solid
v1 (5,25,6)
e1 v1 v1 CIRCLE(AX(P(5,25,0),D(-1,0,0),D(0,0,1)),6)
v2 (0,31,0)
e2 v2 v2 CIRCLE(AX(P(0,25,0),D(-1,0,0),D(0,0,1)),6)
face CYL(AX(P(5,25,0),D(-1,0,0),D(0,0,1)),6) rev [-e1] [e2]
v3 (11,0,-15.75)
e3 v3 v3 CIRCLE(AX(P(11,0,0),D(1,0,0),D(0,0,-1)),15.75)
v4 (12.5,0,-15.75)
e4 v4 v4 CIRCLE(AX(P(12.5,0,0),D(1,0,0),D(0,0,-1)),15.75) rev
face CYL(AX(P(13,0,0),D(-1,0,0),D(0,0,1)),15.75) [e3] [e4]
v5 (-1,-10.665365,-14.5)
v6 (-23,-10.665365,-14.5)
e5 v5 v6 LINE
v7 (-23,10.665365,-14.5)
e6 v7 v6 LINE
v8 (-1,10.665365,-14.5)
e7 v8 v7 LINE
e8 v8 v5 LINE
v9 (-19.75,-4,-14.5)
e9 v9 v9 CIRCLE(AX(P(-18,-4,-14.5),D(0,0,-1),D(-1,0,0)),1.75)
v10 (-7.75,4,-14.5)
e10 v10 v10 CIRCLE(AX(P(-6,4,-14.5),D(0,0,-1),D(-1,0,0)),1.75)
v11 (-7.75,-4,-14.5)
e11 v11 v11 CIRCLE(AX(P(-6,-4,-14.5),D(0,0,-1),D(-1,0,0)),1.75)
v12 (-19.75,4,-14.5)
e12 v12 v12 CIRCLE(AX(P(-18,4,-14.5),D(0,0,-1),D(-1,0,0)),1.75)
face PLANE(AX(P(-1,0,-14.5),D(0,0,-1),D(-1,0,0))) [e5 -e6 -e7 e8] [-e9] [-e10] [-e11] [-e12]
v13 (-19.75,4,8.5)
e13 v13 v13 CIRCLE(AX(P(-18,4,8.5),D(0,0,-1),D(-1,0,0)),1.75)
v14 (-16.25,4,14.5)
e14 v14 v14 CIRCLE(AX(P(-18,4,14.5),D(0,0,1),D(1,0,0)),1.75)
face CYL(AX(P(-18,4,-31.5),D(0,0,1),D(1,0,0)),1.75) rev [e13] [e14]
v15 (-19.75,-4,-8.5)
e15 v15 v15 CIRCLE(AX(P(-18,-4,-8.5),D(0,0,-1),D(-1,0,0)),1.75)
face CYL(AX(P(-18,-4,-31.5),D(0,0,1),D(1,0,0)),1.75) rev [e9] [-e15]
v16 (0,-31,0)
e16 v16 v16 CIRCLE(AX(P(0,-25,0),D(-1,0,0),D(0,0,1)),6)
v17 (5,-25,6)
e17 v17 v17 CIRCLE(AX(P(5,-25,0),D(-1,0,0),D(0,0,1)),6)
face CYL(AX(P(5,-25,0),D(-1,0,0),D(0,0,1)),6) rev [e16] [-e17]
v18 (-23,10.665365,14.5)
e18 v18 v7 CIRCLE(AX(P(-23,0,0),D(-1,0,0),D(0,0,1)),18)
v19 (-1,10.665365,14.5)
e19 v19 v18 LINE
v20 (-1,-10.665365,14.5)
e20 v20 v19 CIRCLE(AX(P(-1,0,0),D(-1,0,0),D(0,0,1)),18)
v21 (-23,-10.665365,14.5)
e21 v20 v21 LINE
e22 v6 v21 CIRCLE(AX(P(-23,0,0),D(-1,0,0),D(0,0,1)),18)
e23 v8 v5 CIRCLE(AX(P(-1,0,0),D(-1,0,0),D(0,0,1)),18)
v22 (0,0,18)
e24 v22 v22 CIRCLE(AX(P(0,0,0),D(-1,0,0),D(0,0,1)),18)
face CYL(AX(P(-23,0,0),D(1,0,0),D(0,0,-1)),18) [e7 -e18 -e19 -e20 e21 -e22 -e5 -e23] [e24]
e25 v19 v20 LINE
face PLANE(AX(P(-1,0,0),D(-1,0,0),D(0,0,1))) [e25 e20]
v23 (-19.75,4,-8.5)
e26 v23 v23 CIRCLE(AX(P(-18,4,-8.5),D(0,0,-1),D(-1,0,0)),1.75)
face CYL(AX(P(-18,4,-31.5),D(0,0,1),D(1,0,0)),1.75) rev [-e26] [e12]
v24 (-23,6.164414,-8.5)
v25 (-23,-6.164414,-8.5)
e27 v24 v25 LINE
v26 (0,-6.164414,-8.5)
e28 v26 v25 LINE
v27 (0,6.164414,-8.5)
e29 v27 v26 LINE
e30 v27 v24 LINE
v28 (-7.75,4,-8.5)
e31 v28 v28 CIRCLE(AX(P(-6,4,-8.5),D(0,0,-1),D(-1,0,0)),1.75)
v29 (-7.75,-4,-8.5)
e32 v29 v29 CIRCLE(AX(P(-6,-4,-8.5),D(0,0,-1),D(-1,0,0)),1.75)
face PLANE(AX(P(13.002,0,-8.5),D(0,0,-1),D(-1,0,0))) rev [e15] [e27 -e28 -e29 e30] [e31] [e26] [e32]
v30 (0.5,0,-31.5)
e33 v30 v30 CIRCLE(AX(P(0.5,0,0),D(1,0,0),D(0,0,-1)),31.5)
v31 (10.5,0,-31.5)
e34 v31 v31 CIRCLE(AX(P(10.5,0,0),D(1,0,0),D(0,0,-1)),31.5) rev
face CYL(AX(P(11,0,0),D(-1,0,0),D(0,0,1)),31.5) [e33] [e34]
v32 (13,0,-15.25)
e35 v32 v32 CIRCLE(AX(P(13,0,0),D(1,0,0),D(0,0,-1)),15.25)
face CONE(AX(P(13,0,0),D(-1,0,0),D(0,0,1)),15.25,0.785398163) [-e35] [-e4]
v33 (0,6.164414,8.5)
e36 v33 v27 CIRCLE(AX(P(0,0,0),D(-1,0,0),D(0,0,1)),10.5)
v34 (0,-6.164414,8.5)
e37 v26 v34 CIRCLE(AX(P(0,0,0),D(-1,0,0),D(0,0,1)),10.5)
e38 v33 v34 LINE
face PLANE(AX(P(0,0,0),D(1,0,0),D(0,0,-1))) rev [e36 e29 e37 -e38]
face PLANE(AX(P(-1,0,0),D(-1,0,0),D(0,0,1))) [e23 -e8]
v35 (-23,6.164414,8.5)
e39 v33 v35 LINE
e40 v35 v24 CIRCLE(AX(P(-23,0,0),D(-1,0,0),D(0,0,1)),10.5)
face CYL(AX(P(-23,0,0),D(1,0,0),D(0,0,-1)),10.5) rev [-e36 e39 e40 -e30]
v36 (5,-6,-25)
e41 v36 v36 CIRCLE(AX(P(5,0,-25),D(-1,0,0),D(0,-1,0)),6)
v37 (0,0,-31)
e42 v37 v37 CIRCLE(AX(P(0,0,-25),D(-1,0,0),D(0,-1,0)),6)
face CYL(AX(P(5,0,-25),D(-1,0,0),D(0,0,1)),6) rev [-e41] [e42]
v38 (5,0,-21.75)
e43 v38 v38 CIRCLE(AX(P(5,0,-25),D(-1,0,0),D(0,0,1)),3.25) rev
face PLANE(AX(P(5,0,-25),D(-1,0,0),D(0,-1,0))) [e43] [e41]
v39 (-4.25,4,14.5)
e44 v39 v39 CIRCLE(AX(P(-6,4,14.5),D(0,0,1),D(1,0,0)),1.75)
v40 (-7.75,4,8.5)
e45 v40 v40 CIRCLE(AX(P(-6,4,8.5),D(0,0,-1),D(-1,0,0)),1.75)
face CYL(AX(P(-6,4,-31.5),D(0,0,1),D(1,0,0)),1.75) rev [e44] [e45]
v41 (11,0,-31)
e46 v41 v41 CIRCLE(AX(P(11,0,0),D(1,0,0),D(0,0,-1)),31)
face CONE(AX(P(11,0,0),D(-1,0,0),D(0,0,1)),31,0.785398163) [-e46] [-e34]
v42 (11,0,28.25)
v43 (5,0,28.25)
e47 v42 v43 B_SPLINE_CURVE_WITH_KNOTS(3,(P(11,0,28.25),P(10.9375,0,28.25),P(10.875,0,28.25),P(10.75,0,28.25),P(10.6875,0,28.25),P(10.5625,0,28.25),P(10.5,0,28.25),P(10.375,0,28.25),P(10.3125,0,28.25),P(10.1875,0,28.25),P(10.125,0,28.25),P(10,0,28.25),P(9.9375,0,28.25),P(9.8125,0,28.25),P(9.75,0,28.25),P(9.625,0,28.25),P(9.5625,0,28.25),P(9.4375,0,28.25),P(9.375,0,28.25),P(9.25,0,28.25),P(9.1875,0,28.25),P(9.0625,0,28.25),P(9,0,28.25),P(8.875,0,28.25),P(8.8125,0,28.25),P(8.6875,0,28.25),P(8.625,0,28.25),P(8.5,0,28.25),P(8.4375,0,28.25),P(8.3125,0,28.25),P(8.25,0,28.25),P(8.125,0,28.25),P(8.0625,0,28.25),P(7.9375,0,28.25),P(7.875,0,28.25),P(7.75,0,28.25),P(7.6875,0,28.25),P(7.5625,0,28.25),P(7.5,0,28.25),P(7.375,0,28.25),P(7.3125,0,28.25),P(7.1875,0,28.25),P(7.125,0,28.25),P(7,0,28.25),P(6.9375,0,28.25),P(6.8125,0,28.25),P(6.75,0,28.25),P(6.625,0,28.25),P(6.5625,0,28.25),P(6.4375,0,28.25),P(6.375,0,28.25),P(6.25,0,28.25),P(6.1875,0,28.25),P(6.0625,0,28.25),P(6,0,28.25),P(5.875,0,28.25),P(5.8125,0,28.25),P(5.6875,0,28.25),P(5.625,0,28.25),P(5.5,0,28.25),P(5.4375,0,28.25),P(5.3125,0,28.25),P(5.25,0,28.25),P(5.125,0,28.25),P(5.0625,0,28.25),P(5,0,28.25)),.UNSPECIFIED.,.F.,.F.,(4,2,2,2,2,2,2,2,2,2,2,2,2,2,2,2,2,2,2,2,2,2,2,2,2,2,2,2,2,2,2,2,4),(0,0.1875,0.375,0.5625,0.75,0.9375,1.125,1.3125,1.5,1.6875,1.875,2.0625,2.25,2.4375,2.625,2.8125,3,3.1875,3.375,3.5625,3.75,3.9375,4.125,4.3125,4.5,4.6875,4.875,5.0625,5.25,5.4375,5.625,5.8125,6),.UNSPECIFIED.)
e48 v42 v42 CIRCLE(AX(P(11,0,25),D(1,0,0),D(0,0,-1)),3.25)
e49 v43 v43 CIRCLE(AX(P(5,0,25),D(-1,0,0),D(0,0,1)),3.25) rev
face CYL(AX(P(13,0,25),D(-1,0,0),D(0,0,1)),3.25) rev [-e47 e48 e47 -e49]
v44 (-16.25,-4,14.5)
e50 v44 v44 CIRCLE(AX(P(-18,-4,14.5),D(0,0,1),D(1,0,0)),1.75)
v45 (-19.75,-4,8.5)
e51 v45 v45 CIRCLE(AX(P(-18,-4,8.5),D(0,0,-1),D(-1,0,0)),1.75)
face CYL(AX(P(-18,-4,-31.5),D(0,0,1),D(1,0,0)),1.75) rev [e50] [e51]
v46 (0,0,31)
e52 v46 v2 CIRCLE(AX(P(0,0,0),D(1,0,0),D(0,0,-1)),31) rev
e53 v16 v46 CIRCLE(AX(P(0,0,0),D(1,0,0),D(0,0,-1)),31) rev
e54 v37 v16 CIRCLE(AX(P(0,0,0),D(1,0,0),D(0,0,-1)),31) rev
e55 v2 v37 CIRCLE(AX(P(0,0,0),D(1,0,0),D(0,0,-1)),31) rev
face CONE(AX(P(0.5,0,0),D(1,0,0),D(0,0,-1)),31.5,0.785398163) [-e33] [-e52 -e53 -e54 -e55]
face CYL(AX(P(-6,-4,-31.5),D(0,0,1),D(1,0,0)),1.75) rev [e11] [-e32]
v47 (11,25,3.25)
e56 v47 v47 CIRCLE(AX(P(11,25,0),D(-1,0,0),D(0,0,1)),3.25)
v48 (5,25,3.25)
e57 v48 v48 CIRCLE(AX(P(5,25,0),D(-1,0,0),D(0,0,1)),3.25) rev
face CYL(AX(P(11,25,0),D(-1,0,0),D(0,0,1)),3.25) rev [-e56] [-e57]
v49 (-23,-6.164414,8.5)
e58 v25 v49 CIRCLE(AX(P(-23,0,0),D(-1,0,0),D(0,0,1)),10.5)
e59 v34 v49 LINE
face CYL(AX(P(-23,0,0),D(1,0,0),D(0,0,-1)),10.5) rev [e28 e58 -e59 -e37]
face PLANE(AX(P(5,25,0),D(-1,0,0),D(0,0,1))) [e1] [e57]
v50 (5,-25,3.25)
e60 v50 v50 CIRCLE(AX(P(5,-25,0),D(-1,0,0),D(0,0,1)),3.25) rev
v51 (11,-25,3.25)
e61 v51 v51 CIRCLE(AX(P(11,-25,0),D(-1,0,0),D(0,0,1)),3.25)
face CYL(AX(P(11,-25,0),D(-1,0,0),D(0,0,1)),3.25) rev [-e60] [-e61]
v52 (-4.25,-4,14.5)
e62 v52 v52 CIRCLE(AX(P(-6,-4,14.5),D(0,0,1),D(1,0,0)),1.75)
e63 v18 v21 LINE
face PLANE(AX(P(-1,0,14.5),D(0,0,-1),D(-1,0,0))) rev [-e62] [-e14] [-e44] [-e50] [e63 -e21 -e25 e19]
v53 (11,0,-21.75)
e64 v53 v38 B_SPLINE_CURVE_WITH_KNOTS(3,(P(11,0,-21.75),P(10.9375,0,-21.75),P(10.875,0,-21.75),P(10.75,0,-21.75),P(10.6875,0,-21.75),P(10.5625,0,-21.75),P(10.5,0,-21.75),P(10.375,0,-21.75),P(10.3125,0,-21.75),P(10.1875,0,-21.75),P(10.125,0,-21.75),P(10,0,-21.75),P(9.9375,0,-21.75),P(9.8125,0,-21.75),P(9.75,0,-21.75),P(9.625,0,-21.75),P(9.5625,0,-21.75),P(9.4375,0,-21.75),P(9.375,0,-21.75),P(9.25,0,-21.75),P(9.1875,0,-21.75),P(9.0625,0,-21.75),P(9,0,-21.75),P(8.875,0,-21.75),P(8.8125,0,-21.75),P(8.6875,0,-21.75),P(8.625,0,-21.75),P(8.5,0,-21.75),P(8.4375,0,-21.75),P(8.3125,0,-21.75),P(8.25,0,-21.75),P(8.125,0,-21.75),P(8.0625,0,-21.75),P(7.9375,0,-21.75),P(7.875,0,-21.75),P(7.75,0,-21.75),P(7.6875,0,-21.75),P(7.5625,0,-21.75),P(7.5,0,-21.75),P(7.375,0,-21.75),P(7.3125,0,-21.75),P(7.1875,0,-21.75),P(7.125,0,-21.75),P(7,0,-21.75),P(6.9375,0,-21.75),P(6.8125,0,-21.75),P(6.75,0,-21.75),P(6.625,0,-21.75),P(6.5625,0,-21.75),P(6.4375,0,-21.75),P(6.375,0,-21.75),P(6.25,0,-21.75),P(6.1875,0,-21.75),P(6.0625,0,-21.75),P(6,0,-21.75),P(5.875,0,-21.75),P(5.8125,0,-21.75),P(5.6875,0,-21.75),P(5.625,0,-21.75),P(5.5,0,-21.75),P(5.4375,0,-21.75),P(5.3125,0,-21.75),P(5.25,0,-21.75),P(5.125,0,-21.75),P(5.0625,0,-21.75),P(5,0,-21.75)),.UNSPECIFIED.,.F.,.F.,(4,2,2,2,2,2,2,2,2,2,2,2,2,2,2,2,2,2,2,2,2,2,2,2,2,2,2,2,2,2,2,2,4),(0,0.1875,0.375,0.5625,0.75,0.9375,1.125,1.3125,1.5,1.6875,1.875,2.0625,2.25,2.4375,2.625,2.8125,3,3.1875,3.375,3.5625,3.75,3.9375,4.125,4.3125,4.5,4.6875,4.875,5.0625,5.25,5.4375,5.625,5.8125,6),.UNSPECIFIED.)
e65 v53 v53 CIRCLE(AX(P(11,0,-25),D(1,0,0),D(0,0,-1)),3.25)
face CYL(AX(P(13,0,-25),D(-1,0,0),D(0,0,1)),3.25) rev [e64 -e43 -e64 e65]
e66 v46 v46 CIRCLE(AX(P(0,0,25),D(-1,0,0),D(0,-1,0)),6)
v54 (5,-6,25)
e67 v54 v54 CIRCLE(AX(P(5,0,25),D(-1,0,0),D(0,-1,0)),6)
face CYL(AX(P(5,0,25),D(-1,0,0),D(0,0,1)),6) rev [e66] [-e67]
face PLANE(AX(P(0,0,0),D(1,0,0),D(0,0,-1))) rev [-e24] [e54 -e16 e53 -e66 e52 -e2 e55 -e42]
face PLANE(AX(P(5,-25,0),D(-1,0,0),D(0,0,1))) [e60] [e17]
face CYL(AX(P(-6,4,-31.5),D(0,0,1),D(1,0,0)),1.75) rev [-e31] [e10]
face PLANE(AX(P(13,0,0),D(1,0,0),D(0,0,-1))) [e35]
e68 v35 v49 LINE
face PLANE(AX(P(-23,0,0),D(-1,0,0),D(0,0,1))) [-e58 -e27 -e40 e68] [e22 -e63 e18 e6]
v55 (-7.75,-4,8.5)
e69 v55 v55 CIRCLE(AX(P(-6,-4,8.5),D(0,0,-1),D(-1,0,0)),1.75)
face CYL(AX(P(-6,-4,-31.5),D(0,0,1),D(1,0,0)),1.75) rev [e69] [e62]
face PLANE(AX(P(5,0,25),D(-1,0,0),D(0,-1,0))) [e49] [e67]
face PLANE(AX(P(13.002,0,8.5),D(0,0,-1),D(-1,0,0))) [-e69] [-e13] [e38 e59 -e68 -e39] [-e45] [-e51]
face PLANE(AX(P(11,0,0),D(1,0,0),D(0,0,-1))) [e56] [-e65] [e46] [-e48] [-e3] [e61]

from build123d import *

# Parameters (mm, degrees)
SKETCH1_R           = 31.5
BOSS_EXTRUDE1_DEPTH = 11
SKETCH2_R           = 3.25
CUT_EXTRUDE1_DEPTH  = 46.885727629
SKETCH3_R           = 6
CUT_EXTRUDE2_DEPTH  = 5
CHAMFER1_SIZE       = 0.5
SKETCH4_R           = 15.75
BOSS_EXTRUDE2_DEPTH = 2
CHAMFER2_SIZE       = 0.5
SKETCH5_R           = 18
SKETCH5_R_2         = 10.5
BOSS_EXTRUDE3_DEPTH = 23
BOSS_EXTRUDE4_REACH = 59.276
CUT_EXTRUDE3_START  = -22
CUT_EXTRUDE3_DEPTH  = 22
SKETCH8_R           = 1.75
CUT_EXTRUDE4_DEPTH  = 61.309617807
CIRPATTERN1_COUNT   = 4


with BuildPart() as part:
    # Sketch1 → Boss-Extrude1 (new body)
    with BuildSketch(Plane(origin=(0, 0, 0), x_dir=(0, 0, -1), z_dir=(1, 0, 0))):
        Circle(SKETCH1_R)
    extrude(amount=BOSS_EXTRUDE1_DEPTH)

    # Sketch2 → Cut-Extrude1 (cut, through all)
    with BuildSketch(Plane.ZY):
        with Locations((0, 25)):
            Circle(SKETCH2_R)
        with Locations((0, -25)):
            Circle(SKETCH2_R)
    cut_extrude1 = extrude(amount=-CUT_EXTRUDE1_DEPTH, mode=Mode.SUBTRACT)

    # Sketch3 → Cut-Extrude2 (cut)
    with BuildSketch(Plane.ZY):
        with Locations((0, 25)):
            Circle(SKETCH3_R)
        with Locations((0, -25)):
            Circle(SKETCH3_R)
    cut_extrude2 = extrude(amount=-CUT_EXTRUDE2_DEPTH, mode=Mode.SUBTRACT)

    # Chamfer1
    chamfer1_edges = [part.edges().sort_by_distance(p)[0] for p in [
        (0, 0, 31.5),
        (11, 0, 31.5),
    ]]
    chamfer(chamfer1_edges, length=CHAMFER1_SIZE - 0.0001)  # a hair under: the kernel refuses the full size

    # Sketch4 → Boss-Extrude2 (add)
    with BuildSketch(Plane(origin=(11, 0, 0), x_dir=(0, 0, -1), z_dir=(1, 0, 0))):
        Circle(SKETCH4_R)
    extrude(amount=BOSS_EXTRUDE2_DEPTH)

    # Chamfer2
    chamfer2_edges = [part.edges().sort_by_distance(p)[0] for p in [
        (13, 0, 15.75),
    ]]
    chamfer(chamfer2_edges, length=CHAMFER2_SIZE)

    # Sketch5 → Boss-Extrude3 (add)
    with BuildSketch(Plane.ZY):
        Circle(SKETCH5_R)
        Circle(SKETCH5_R_2, mode=Mode.SUBTRACT)
    extrude(amount=BOSS_EXTRUDE3_DEPTH)

    # Sketch6 → Boss-Extrude4 (add, up to next)
    with BuildSketch(Plane.ZY.offset(23), mode=Mode.PRIVATE) as boss_extrude4_sk1:
        with BuildLine():
            ThreePointArc((10.5, 0), (9.987492178, 3.240370349), (8.5, 6.164414003))
            Line((8.5, 6.164414003), (8.5, -6.164414003))
            ThreePointArc((8.5, -6.164414003), (9.987492178, -3.240370349), (10.5, 0))
        make_face()
    boss_extrude4_tool1 = extrude(boss_extrude4_sk1.sketch, amount=-BOSS_EXTRUDE4_REACH, mode=Mode.PRIVATE) - part.part
    # Sketch6 → Boss-Extrude4 (add, up to next)
    with BuildSketch(Plane.ZY.offset(23), mode=Mode.PRIVATE) as boss_extrude4_sk2:
        with BuildLine():
            Line((-8.5, -6.164414003), (-8.5, 6.164414003))
            ThreePointArc((-8.5, 6.164414003), (-10.5, 0), (-8.5, -6.164414003))
        make_face()
    boss_extrude4_tool2 = extrude(boss_extrude4_sk2.sketch, amount=-BOSS_EXTRUDE4_REACH, mode=Mode.PRIVATE) - part.part
    add(boss_extrude4_tool1.solids().sort_by_distance((-23, 0, 9.306913))[0])
    add(boss_extrude4_tool2.solids().sort_by_distance((-23, 0, -9.306913))[0])

    # Sketch7 → Cut-Extrude3 (cut)
    with BuildSketch(Plane.ZY.offset(23).offset(CUT_EXTRUDE3_START)):
        with BuildLine():
            ThreePointArc((18, 0), (17.102631376, 5.61248608), (14.5, 10.665364504))
            Line((14.5, 10.665364504), (14.5, -10.665364504))
            ThreePointArc((14.5, -10.665364504), (17.102631376, -5.61248608), (18, 0))
        make_face()
        with BuildLine():
            Line((-14.5, -10.665364504), (-14.5, 10.665364504))
            ThreePointArc((-14.5, 10.665364504), (-18, 0), (-14.5, -10.665364504))
        make_face()
    extrude(amount=CUT_EXTRUDE3_DEPTH, mode=Mode.SUBTRACT)

    # Sketch8 → Cut-Extrude4 (cut, through all)
    with BuildSketch(Plane.XY.offset(14.5)):
        with Locations((-18, 4)):
            Circle(SKETCH8_R)
        with Locations((-6, 4)):
            Circle(SKETCH8_R)
        with Locations((-6, -4)):
            Circle(SKETCH8_R)
        with Locations((-18, -4)):
            Circle(SKETCH8_R)
    extrude(amount=-CUT_EXTRUDE4_DEPTH, mode=Mode.SUBTRACT)

    # CirPattern1: Cut-Extrude1, Cut-Extrude2 ×4 about axis
    cirpattern1_axis = Axis((0, 0, 0), (1, 0, 0))
    add([cut_extrude1.rotate(cirpattern1_axis, i * 360 / CIRPATTERN1_COUNT) for i in range(1, CIRPATTERN1_COUNT)], mode=Mode.SUBTRACT)
    add([cut_extrude2.rotate(cirpattern1_axis, i * 360 / CIRPATTERN1_COUNT) for i in range(1, CIRPATTERN1_COUNT)], mode=Mode.SUBTRACT)


solid = part.part
